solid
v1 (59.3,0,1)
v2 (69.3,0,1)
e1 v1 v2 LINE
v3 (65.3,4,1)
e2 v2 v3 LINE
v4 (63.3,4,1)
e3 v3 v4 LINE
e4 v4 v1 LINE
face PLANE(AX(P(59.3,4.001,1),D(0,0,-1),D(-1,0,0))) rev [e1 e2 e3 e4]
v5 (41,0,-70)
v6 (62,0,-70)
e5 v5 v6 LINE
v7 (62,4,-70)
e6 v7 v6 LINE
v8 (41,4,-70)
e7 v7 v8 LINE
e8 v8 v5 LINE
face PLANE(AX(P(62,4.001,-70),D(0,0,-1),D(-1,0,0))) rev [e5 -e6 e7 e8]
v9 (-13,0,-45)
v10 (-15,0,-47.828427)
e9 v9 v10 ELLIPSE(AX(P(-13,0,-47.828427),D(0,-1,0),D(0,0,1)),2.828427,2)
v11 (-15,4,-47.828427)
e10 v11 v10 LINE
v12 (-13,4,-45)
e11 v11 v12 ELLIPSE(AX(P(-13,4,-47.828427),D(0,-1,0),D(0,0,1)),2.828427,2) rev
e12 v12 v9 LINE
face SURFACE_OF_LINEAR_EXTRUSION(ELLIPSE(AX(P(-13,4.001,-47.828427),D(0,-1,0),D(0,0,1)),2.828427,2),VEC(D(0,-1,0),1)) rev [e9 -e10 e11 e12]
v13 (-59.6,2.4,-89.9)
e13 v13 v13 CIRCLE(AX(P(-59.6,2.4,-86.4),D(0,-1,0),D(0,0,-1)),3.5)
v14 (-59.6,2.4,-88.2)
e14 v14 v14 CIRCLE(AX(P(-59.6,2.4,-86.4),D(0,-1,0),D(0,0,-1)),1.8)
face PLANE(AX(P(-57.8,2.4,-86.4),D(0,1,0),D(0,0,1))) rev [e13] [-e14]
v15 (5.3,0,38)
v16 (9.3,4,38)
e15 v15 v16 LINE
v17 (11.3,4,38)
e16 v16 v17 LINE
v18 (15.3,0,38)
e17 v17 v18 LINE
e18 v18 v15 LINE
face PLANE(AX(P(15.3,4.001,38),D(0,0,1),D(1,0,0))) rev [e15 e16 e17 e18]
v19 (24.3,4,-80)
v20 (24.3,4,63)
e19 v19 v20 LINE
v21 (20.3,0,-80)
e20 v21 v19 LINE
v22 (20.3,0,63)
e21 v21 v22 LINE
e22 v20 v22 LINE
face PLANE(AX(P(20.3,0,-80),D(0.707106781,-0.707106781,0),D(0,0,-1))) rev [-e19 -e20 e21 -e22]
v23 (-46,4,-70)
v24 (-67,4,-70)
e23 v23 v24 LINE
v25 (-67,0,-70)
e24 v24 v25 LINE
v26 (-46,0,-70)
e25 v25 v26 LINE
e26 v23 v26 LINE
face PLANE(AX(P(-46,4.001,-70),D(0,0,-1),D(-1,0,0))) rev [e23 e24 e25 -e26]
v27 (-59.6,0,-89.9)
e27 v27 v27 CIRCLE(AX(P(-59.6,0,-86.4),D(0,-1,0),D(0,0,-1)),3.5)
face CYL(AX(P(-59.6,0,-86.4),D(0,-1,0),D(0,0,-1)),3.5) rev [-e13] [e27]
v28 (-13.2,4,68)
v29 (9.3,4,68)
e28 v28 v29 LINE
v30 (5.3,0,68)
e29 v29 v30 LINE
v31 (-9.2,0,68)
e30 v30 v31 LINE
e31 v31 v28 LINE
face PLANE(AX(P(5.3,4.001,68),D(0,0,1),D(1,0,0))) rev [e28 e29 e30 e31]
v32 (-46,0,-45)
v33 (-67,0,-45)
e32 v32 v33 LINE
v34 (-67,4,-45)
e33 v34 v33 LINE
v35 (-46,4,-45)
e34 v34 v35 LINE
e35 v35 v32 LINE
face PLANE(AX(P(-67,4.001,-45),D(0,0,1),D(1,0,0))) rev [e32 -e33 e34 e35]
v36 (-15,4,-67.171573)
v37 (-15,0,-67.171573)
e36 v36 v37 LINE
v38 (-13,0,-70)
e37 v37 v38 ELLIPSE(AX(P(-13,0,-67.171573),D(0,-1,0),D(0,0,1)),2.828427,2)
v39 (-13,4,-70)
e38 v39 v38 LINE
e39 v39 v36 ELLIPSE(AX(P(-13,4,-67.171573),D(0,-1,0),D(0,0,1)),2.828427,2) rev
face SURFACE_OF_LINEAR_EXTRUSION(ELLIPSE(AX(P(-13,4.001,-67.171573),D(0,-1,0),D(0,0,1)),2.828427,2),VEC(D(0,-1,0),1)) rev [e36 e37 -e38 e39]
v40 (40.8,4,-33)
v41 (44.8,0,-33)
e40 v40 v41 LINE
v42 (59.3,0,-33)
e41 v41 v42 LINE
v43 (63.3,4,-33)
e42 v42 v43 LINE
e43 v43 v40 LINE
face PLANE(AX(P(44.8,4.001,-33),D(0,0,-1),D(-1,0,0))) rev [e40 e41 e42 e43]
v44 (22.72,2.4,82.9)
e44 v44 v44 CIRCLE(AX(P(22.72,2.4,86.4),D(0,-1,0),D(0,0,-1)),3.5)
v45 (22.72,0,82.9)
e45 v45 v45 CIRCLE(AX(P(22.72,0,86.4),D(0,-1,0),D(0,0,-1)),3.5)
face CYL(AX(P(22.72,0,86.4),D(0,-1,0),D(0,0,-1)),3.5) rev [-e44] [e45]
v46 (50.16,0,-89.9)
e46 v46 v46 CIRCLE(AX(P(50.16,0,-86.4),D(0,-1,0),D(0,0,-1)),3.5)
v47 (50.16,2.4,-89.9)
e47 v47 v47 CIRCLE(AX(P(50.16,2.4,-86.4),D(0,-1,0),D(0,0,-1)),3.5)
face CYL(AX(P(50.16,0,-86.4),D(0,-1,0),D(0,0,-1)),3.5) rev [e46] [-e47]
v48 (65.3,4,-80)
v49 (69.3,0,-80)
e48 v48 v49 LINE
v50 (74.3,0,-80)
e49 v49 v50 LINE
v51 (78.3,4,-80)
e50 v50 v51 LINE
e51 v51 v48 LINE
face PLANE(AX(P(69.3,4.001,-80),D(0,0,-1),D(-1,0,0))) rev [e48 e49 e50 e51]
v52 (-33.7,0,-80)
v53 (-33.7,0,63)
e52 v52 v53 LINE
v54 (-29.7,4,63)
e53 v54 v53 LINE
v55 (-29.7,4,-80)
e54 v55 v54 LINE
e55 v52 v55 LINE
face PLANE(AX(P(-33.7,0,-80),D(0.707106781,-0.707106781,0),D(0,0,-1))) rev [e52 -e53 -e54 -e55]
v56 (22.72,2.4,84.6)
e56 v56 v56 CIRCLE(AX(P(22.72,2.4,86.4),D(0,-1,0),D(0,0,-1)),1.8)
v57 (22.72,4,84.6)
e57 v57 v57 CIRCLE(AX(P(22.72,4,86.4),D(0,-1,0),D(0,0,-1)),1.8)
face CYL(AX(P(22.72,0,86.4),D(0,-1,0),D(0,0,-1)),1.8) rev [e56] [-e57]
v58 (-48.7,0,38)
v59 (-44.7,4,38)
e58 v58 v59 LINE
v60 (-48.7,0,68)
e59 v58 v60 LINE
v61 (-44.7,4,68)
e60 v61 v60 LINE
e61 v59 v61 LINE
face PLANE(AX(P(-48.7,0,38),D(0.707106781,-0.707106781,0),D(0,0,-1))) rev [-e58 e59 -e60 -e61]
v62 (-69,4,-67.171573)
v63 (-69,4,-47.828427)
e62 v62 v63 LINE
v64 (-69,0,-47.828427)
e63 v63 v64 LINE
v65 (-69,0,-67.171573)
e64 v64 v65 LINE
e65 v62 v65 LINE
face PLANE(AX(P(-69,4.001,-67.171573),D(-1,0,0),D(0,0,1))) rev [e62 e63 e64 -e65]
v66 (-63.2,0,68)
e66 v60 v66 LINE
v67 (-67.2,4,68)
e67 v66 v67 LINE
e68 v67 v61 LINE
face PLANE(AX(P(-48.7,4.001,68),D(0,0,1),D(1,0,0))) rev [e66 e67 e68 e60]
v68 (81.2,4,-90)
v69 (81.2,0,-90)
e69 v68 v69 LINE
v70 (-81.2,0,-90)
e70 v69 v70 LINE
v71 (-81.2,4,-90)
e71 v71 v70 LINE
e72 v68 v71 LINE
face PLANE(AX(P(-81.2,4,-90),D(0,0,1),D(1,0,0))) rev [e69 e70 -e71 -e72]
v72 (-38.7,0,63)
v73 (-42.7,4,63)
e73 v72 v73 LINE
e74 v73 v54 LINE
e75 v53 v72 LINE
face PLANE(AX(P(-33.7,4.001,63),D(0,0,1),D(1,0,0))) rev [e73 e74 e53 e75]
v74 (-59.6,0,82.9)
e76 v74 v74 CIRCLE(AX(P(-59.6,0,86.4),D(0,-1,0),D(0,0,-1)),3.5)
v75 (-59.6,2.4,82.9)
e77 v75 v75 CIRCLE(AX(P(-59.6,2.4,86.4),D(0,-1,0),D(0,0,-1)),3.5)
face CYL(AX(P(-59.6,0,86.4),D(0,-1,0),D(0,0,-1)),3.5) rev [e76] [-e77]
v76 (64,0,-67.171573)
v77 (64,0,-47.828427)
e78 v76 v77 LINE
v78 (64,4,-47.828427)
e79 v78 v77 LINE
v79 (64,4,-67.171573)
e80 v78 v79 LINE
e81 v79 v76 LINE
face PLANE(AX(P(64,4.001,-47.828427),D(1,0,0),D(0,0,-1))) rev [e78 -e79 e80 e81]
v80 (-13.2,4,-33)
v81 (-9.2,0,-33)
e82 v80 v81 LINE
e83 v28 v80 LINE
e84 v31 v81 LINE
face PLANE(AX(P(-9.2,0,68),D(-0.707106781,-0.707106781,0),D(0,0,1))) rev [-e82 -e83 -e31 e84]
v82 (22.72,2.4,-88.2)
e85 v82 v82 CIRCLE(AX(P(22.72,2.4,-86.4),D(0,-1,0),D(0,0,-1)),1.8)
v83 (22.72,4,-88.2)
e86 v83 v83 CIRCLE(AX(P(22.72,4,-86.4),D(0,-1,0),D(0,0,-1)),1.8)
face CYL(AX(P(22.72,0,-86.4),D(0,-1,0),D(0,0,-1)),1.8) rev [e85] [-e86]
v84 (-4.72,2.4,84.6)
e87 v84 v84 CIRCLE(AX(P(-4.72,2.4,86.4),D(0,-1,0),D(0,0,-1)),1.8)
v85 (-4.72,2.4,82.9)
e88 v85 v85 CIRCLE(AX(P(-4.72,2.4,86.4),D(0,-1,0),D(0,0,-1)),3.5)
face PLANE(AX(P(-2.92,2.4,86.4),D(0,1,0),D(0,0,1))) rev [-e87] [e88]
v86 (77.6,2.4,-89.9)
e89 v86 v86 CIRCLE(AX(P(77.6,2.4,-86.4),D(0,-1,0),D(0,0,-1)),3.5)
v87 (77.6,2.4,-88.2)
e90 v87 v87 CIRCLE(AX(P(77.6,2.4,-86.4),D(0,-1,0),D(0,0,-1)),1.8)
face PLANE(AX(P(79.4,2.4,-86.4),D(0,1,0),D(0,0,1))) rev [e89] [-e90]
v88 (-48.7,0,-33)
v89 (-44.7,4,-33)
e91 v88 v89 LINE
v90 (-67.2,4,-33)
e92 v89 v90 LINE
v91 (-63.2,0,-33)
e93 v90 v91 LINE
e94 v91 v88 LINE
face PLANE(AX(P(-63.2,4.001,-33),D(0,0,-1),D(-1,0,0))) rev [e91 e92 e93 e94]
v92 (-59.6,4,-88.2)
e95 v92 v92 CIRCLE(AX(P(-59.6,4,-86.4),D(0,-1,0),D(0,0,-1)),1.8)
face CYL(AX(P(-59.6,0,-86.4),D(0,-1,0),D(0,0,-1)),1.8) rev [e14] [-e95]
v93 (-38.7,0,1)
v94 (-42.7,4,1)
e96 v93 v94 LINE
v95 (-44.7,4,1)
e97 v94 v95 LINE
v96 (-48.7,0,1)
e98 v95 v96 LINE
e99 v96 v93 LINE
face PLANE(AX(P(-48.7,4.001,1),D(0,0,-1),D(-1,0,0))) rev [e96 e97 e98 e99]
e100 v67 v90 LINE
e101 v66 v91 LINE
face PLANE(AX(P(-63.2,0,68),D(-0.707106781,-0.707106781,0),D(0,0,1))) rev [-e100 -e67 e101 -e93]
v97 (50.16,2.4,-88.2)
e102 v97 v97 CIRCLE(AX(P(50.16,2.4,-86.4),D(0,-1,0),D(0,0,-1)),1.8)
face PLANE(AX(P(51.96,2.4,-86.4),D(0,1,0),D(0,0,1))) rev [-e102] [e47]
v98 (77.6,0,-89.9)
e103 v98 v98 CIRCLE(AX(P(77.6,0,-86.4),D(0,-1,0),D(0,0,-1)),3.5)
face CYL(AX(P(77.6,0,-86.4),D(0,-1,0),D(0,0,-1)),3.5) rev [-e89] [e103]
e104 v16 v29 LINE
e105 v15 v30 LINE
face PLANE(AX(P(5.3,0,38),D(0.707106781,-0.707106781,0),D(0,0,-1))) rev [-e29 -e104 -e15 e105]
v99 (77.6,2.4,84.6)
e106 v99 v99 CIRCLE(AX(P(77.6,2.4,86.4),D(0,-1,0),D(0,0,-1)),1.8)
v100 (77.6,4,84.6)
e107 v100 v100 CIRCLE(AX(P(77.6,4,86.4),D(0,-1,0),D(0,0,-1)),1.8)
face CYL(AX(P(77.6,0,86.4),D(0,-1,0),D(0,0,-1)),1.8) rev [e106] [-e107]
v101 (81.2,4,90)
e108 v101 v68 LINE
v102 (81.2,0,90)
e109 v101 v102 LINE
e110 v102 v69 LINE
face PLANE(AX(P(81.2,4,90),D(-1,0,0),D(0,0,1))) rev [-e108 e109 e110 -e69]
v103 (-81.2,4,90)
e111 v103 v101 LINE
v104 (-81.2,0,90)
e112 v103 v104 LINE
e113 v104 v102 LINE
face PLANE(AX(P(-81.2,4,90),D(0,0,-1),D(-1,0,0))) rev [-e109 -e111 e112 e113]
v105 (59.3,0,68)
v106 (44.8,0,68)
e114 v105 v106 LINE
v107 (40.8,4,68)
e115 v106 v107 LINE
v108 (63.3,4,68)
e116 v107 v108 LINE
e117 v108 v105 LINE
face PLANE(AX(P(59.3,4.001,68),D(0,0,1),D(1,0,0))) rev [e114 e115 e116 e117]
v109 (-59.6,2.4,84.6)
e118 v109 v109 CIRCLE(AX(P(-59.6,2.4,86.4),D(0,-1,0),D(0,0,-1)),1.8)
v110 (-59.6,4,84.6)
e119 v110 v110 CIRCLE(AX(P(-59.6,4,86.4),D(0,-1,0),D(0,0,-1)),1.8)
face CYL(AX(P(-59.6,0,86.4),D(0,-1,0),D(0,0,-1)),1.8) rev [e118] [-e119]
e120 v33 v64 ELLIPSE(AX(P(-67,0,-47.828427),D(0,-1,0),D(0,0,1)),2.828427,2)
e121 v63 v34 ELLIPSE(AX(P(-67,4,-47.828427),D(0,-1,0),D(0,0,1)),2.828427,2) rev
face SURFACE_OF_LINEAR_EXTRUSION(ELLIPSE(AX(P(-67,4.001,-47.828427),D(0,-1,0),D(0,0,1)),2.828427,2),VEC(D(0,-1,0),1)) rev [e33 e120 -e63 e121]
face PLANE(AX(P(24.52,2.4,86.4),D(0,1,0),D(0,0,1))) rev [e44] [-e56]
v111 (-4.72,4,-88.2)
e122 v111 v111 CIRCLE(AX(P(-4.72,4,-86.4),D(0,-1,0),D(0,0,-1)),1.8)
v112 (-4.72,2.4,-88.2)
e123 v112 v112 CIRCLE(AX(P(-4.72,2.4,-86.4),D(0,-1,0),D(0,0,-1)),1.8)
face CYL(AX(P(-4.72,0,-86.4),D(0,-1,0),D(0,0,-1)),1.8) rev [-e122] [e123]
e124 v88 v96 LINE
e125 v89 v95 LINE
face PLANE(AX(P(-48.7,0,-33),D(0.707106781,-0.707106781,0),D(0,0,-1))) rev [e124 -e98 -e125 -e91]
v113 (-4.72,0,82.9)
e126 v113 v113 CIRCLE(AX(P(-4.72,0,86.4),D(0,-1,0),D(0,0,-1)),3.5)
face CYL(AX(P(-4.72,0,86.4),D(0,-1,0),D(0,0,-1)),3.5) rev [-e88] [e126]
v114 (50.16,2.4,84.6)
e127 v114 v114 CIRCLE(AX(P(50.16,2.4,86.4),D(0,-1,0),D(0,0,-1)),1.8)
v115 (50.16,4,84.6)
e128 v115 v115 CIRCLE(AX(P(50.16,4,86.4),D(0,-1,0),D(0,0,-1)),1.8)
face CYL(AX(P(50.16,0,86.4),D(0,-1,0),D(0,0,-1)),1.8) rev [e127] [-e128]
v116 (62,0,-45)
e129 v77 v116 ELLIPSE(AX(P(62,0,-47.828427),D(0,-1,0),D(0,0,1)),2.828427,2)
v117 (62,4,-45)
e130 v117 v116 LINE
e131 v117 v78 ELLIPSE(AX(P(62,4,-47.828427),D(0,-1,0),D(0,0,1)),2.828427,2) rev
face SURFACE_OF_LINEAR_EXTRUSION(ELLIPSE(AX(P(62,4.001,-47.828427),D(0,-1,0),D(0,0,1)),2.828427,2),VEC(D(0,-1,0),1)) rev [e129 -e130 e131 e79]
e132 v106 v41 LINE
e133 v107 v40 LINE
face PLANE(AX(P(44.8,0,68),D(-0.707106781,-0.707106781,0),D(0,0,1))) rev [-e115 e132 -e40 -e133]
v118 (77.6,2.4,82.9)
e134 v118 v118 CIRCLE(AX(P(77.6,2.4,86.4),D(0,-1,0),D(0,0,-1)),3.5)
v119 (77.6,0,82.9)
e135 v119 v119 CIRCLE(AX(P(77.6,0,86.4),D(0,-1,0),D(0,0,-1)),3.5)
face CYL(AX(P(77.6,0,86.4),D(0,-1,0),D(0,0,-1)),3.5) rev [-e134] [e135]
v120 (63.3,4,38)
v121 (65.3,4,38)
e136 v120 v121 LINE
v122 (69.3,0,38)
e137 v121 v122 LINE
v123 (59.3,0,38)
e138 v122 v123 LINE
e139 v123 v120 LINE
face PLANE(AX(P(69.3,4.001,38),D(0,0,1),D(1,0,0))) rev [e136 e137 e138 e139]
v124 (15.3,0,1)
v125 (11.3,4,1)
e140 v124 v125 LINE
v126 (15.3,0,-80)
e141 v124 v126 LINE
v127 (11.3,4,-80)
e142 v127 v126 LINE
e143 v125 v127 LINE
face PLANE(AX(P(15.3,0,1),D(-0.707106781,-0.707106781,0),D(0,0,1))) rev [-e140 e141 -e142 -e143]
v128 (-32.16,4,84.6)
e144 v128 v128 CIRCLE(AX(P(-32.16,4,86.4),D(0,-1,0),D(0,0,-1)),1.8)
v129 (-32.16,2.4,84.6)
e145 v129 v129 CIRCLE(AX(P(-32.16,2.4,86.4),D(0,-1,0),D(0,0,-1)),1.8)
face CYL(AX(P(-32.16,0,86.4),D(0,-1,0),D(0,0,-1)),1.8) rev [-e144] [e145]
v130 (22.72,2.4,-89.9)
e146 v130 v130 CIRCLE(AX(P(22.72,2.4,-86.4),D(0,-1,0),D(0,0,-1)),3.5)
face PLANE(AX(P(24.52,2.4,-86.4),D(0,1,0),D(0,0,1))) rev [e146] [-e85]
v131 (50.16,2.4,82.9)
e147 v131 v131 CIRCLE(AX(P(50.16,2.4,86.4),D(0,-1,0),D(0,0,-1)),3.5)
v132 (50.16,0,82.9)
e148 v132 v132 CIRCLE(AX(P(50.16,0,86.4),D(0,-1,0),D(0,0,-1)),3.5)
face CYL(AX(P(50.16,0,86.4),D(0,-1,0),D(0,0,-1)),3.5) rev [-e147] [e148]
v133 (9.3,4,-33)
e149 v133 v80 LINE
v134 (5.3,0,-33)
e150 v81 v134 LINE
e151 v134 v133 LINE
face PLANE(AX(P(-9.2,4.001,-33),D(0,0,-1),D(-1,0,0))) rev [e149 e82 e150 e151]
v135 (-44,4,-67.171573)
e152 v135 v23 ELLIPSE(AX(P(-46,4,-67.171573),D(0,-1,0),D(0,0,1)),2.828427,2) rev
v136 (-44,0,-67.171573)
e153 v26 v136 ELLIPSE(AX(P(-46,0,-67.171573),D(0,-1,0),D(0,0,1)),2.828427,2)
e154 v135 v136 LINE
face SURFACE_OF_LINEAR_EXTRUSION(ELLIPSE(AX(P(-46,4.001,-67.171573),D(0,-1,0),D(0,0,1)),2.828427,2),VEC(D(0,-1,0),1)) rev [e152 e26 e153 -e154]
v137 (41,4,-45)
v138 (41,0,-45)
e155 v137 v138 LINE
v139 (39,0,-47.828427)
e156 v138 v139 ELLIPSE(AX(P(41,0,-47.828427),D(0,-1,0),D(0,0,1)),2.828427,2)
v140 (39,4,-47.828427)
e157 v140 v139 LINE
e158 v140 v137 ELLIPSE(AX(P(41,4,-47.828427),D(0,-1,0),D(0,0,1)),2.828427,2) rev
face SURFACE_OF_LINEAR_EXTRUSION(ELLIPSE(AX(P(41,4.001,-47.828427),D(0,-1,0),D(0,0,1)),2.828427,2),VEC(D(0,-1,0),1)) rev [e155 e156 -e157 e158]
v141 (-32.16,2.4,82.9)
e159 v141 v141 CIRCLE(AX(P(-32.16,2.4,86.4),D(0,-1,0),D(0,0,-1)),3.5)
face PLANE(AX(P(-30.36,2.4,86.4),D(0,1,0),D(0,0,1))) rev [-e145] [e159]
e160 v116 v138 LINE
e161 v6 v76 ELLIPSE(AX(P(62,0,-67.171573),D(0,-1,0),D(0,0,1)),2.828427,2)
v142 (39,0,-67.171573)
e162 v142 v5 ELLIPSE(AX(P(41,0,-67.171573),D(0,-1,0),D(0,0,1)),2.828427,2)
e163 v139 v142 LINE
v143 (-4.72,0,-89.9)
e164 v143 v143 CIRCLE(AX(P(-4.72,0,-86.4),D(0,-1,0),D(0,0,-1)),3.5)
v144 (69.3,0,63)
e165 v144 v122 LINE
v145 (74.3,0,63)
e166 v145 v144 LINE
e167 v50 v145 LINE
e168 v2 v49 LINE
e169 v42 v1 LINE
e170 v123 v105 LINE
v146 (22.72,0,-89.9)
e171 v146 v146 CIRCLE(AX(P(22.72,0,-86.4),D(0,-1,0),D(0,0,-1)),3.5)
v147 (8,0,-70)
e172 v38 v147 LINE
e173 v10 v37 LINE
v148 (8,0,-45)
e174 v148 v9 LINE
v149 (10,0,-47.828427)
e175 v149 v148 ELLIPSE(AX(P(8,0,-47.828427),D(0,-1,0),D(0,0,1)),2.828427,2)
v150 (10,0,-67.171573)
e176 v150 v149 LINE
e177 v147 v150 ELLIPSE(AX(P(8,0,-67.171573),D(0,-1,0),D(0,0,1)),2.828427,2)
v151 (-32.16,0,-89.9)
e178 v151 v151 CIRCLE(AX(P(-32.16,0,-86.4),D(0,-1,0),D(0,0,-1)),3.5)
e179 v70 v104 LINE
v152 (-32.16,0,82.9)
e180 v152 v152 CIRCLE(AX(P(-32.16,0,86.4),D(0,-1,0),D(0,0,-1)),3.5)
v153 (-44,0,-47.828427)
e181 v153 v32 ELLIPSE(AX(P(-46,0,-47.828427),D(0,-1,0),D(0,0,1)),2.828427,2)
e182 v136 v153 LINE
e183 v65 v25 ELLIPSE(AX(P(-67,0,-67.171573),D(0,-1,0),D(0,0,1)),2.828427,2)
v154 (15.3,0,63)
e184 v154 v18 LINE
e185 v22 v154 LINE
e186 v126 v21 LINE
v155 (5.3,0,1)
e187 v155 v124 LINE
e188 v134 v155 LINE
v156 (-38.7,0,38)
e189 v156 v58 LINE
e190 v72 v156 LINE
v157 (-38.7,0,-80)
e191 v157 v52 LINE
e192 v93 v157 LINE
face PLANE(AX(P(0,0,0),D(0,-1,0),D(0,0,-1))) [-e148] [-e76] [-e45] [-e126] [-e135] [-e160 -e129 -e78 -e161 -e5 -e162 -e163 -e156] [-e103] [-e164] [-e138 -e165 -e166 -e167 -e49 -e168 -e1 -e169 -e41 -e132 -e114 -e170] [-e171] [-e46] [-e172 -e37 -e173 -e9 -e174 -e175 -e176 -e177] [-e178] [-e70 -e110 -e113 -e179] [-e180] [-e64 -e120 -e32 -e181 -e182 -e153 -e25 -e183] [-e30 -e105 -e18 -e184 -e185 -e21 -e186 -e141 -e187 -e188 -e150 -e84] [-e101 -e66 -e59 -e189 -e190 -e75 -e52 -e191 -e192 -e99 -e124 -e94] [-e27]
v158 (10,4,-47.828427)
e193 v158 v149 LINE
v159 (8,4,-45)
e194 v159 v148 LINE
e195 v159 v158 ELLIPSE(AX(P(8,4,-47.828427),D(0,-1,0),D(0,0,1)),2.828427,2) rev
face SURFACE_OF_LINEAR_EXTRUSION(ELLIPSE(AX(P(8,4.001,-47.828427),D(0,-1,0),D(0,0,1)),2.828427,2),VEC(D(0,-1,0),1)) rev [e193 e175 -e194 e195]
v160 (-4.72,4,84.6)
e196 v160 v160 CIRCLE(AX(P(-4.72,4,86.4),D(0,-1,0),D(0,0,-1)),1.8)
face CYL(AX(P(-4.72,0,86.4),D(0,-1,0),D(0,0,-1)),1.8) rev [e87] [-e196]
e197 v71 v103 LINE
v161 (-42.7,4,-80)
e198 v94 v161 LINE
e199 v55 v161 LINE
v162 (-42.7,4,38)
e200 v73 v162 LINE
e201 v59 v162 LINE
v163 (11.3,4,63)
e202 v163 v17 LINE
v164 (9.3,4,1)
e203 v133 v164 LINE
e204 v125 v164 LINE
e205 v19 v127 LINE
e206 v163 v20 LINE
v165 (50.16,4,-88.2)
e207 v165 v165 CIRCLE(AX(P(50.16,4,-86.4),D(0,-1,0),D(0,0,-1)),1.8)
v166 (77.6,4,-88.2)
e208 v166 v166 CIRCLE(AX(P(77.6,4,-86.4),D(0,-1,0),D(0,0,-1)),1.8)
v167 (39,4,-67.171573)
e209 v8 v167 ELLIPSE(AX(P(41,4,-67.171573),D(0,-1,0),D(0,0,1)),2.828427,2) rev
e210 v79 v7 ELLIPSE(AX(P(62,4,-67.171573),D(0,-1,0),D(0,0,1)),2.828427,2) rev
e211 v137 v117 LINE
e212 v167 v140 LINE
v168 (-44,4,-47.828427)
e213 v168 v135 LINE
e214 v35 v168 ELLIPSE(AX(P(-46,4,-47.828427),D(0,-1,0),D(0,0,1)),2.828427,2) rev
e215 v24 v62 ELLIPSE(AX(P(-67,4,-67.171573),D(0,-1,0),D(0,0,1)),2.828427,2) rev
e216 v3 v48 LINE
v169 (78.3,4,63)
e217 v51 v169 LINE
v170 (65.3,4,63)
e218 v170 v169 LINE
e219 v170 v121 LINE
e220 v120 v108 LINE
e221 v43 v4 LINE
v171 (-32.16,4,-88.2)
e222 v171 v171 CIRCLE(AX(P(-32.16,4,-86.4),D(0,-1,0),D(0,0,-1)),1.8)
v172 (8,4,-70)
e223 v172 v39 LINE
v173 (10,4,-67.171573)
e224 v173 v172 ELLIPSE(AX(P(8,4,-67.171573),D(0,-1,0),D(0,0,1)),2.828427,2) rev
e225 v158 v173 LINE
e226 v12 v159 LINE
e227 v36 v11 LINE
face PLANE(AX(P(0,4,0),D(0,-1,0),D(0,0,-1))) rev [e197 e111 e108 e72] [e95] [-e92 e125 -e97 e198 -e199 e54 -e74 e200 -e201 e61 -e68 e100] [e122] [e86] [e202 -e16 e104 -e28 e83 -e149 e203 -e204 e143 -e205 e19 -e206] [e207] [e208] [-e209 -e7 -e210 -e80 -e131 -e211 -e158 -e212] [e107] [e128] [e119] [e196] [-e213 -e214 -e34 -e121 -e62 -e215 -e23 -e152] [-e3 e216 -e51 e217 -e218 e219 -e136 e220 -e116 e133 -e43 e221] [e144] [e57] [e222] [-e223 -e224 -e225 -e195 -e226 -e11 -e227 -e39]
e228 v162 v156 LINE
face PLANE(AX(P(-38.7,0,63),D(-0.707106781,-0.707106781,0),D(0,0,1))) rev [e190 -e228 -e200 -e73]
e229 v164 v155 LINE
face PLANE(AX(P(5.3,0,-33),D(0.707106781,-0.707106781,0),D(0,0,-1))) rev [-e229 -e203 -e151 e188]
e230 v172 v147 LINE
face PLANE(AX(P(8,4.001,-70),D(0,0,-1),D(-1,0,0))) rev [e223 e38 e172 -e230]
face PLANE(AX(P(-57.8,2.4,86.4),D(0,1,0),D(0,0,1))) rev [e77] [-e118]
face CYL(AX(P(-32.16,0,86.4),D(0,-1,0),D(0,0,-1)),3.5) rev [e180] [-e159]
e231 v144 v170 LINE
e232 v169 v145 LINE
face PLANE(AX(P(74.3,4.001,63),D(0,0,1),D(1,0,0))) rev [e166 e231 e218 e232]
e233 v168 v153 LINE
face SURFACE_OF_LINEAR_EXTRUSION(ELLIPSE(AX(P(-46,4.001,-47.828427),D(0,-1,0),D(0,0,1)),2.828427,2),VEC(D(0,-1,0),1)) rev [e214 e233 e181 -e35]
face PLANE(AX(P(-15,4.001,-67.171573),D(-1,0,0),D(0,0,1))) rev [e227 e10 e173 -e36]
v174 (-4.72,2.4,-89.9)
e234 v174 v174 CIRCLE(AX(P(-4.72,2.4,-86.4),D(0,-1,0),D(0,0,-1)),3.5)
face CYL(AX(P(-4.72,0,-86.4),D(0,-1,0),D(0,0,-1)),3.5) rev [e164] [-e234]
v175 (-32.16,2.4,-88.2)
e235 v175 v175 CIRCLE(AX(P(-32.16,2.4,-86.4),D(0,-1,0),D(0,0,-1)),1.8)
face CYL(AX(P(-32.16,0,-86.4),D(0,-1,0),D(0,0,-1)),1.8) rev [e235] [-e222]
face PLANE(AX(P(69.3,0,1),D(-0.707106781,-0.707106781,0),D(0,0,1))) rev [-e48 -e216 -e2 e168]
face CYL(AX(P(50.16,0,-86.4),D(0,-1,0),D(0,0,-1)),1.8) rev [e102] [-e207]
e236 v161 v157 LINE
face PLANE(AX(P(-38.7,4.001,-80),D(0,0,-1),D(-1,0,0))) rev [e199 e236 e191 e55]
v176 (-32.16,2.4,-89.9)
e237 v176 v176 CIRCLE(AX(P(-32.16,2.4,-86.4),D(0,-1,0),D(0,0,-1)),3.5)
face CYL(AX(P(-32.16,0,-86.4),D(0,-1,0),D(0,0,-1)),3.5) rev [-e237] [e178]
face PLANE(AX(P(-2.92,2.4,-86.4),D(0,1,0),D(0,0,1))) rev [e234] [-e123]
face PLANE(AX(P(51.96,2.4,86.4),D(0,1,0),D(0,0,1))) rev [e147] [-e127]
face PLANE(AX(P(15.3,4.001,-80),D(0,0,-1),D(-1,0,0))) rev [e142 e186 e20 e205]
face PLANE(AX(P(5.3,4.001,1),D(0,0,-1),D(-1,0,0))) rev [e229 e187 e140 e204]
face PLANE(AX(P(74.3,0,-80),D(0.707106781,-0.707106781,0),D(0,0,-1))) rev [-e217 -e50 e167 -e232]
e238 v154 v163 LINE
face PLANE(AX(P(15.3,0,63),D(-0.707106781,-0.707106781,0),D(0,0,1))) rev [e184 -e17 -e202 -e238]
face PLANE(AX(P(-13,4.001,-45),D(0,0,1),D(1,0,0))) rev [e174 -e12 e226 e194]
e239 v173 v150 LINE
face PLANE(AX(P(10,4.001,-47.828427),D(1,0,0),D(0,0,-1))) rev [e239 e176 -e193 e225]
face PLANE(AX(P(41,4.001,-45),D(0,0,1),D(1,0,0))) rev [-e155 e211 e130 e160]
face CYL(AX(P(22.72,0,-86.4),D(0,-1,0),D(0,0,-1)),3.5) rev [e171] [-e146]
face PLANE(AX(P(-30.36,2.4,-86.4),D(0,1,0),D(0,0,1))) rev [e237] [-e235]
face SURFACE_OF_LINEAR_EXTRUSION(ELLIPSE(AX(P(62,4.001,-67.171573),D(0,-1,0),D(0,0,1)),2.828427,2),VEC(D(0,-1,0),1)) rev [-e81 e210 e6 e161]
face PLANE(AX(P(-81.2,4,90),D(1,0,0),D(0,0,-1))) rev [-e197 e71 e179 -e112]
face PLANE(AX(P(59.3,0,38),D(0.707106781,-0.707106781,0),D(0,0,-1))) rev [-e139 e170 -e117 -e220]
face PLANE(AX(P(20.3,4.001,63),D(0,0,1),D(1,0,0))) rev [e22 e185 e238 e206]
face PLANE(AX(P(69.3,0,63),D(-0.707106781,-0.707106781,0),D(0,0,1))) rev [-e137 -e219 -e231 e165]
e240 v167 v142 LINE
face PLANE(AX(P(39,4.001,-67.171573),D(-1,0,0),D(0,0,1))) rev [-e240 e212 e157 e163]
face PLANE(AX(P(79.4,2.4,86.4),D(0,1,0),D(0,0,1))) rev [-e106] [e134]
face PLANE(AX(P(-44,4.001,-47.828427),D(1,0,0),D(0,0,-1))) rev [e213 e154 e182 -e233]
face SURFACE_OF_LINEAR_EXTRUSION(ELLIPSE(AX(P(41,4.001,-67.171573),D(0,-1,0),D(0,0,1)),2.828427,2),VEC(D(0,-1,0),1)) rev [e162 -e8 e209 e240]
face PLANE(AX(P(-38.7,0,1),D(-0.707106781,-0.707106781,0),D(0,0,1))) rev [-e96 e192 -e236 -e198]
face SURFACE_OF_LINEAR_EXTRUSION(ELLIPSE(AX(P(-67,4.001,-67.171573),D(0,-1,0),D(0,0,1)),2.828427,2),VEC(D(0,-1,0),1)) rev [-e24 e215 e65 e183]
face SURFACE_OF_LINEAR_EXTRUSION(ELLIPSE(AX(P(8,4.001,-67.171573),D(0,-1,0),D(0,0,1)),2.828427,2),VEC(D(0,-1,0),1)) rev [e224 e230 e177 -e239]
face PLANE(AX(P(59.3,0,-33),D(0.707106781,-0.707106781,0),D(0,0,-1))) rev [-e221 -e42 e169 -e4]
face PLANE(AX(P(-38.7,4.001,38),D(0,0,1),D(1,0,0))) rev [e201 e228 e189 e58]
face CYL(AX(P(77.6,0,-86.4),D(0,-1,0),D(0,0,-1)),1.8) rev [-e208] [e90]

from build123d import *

# Parameters (mm, degrees)
SZKIC1_W                                          = 162.4
SZKIC1_H                                          = 180
DODANIE_WYCI_GNI_CIE1_DEPTH                       = 4
WYTNIJ_WYCI_GNI_CIE1_REACH                        = 123.282
SFAZOWANIE1_SIZE                                  = 4
POG_BIENIE_WALCOWE_POD_M3_RUB_Z_BEM_S_D           = 3.6
POG_BIENIE_WALCOWE_POD_M3_RUB_Z_BEM_S_DEPTH       = 6.7
POG_BIENIE_WALCOWE_POD_M3_RUB_Z_BEM_S_CBORE_D     = 7
POG_BIENIE_WALCOWE_POD_M3_RUB_Z_BEM_S_CBORE_DEPTH = 2.4
POG_BIENIE_WALCOWE_POD_M3_RUB_Z_BEM_S_TIP         = 1.081549114


with BuildPart() as part:
    # Szkic1 → Dodanie-wyciągnięcie1 (new body)
    with BuildSketch(Plane(origin=(0, 0, 0), x_dir=(1, 0, 0), z_dir=(0, 1, 0))):
        Rectangle(SZKIC1_W, SZKIC1_H)
    extrude(amount=DODANIE_WYCI_GNI_CIE1_DEPTH)

    # Szkic2 → Wytnij-wyciągnięcie1 (cut, up to next)
    with BuildSketch(Plane.XZ, mode=Mode.PRIVATE) as wytnij_wyci_gni_cie1_sk1:
        with BuildLine():
            Line((-44, -47.828427125), (-44, -67.171572875))
            add(Edge.make_bspline(
                [(-46, -70), (-44, -70), (-44, -67.171572875)],
                knots=[3.141592654, 3.141592654, 3.141592654, 4.71238898, 4.71238898, 4.71238898], degree=2, weights=[1, 0.707106781, 1]))
            Line((-46, -70), (-67, -70))
            add(Edge.make_bspline(
                [(-69, -67.171572875), (-69, -70), (-67, -70)],
                knots=[1.570796327, 1.570796327, 1.570796327, 3.141592654, 3.141592654, 3.141592654], degree=2, weights=[1, 0.707106781, 1]))
            Line((-69, -67.171572875), (-69, -47.828427125))
            add(Edge.make_bspline(
                [(-67, -45), (-69, -45), (-69, -47.828427125)],
                knots=[0, 0, 0, 1.570796327, 1.570796327, 1.570796327], degree=2, weights=[1, 0.707106781, 1]))
            Line((-67, -45), (-46, -45))
            add(Edge.make_bspline(
                [(-44, -47.828427125), (-44, -45), (-46, -45)],
                knots=[4.71238898, 4.71238898, 4.71238898, 6.283185307, 6.283185307, 6.283185307], degree=2, weights=[1, 0.707106781, 1]))
        make_face()
    wytnij_wyci_gni_cie1_tool1 = extrude(wytnij_wyci_gni_cie1_sk1.sketch, amount=-WYTNIJ_WYCI_GNI_CIE1_REACH, mode=Mode.PRIVATE) & part.part
    # Szkic2 → Wytnij-wyciągnięcie1 (cut, up to next)
    with BuildSketch(Plane.XZ, mode=Mode.PRIVATE) as wytnij_wyci_gni_cie1_sk2:
        with BuildLine():
            Line((10, -47.828427125), (10, -67.171572875))
            add(Edge.make_bspline(
                [(8, -70), (10, -70), (10, -67.171572875)],
                knots=[3.141592654, 3.141592654, 3.141592654, 4.71238898, 4.71238898, 4.71238898], degree=2, weights=[1, 0.707106781, 1]))
            Line((8, -70), (-13, -70))
            add(Edge.make_bspline(
                [(-15, -67.171572875), (-15, -70), (-13, -70)],
                knots=[1.570796327, 1.570796327, 1.570796327, 3.141592654, 3.141592654, 3.141592654], degree=2, weights=[1, 0.707106781, 1]))
            Line((-15, -67.171572875), (-15, -47.828427125))
            add(Edge.make_bspline(
                [(-13, -45), (-15, -45), (-15, -47.828427125)],
                knots=[0, 0, 0, 1.570796327, 1.570796327, 1.570796327], degree=2, weights=[1, 0.707106781, 1]))
            Line((-13, -45), (8, -45))
            add(Edge.make_bspline(
                [(10, -47.828427125), (10, -45), (8, -45)],
                knots=[4.71238898, 4.71238898, 4.71238898, 6.283185307, 6.283185307, 6.283185307], degree=2, weights=[1, 0.707106781, 1]))
        make_face()
    wytnij_wyci_gni_cie1_tool2 = extrude(wytnij_wyci_gni_cie1_sk2.sketch, amount=-WYTNIJ_WYCI_GNI_CIE1_REACH, mode=Mode.PRIVATE) & part.part
    # Szkic2 → Wytnij-wyciągnięcie1 (cut, up to next)
    with BuildSketch(Plane.XZ, mode=Mode.PRIVATE) as wytnij_wyci_gni_cie1_sk3:
        Polygon((-9.2, -33), (5.3, -33), (5.3, 1), (15.3, 1), (15.3, -80), (20.3, -80), (20.3, 63), (15.3, 63), (15.3, 38), (5.3, 38), (5.3, 68), (-9.2, 68), align=None)
    wytnij_wyci_gni_cie1_tool3 = extrude(wytnij_wyci_gni_cie1_sk3.sketch, amount=-WYTNIJ_WYCI_GNI_CIE1_REACH, mode=Mode.PRIVATE) & part.part
    # Szkic2 → Wytnij-wyciągnięcie1 (cut, up to next)
    with BuildSketch(Plane.XZ, mode=Mode.PRIVATE) as wytnij_wyci_gni_cie1_sk4:
        Polygon((-63.2, -33), (-48.7, -33), (-48.7, 1), (-38.7, 1), (-38.7, -80), (-33.7, -80), (-33.7, 63), (-38.7, 63), (-38.7, 38), (-48.7, 38), (-48.7, 68), (-63.2, 68), align=None)
    wytnij_wyci_gni_cie1_tool4 = extrude(wytnij_wyci_gni_cie1_sk4.sketch, amount=-WYTNIJ_WYCI_GNI_CIE1_REACH, mode=Mode.PRIVATE) & part.part
    # Szkic2 → Wytnij-wyciągnięcie1 (cut, up to next)
    with BuildSketch(Plane.XZ, mode=Mode.PRIVATE) as wytnij_wyci_gni_cie1_sk5:
        with BuildLine():
            Line((64, -47.828427125), (64, -67.171572875))
            add(Edge.make_bspline(
                [(62, -70), (64, -70), (64, -67.171572875)],
                knots=[3.141592654, 3.141592654, 3.141592654, 4.71238898, 4.71238898, 4.71238898], degree=2, weights=[1, 0.707106781, 1]))
            Line((62, -70), (41, -70))
            add(Edge.make_bspline(
                [(39, -67.171572875), (39, -70), (41, -70)],
                knots=[1.570796327, 1.570796327, 1.570796327, 3.141592654, 3.141592654, 3.141592654], degree=2, weights=[1, 0.707106781, 1]))
            Line((39, -67.171572875), (39, -47.828427125))
            add(Edge.make_bspline(
                [(41, -45), (39, -45), (39, -47.828427125)],
                knots=[0, 0, 0, 1.570796327, 1.570796327, 1.570796327], degree=2, weights=[1, 0.707106781, 1]))
            Line((41, -45), (62, -45))
            add(Edge.make_bspline(
                [(64, -47.828427125), (64, -45), (62, -45)],
                knots=[4.71238898, 4.71238898, 4.71238898, 6.283185307, 6.283185307, 6.283185307], degree=2, weights=[1, 0.707106781, 1]))
        make_face()
    wytnij_wyci_gni_cie1_tool5 = extrude(wytnij_wyci_gni_cie1_sk5.sketch, amount=-WYTNIJ_WYCI_GNI_CIE1_REACH, mode=Mode.PRIVATE) & part.part
    # Szkic2 → Wytnij-wyciągnięcie1 (cut, up to next)
    with BuildSketch(Plane.XZ, mode=Mode.PRIVATE) as wytnij_wyci_gni_cie1_sk6:
        Polygon((44.8, -33), (59.3, -33), (59.3, 1), (69.3, 1), (69.3, -80), (74.3, -80), (74.3, 63), (69.3, 63), (69.3, 38), (59.3, 38), (59.3, 68), (44.8, 68), align=None)
    wytnij_wyci_gni_cie1_tool6 = extrude(wytnij_wyci_gni_cie1_sk6.sketch, amount=-WYTNIJ_WYCI_GNI_CIE1_REACH, mode=Mode.PRIVATE) & part.part
    add(wytnij_wyci_gni_cie1_tool1.solids().sort_by_distance((-56.5, 0, -57.5))[0], mode=Mode.SUBTRACT)
    add(wytnij_wyci_gni_cie1_tool2.solids().sort_by_distance((-2.5, 0, -57.5))[0], mode=Mode.SUBTRACT)
    add(wytnij_wyci_gni_cie1_tool3.solids().sort_by_distance((5.366631, 0, 10.498627))[0], mode=Mode.SUBTRACT)
    add(wytnij_wyci_gni_cie1_tool4.solids().sort_by_distance((-48.633369, 0, 10.498627))[0], mode=Mode.SUBTRACT)
    add(wytnij_wyci_gni_cie1_tool5.solids().sort_by_distance((51.5, 0, -57.5))[0], mode=Mode.SUBTRACT)
    add(wytnij_wyci_gni_cie1_tool6.solids().sort_by_distance((59.366631, 0, 10.498627))[0], mode=Mode.SUBTRACT)

    # Sfazowanie1
    sfazowanie1_edges = [part.edges().sort_by_distance(p)[0] for p in [
        (69.3, 4, -39.5),
        (74.3, 4, -8.5),
        (69.3, 4, 50.5),
        (59.3, 4, 53),
        (59.3, 4, -16),
        (44.8, 4, 17.5),
        (15.3, 4, -39.5),
        (15.3, 4, 50.5),
        (20.3, 4, -8.5),
        (5.3, 4, 53),
        (5.3, 4, -16),
        (-9.2, 4, 17.5),
        (-33.7, 4, -8.5),
        (-38.7, 4, -39.5),
        (-38.7, 4, 50.5),
        (-48.7, 4, 53),
        (-48.7, 4, -16),
        (-63.2, 4, 17.5),
    ]]
    chamfer(sfazowanie1_edges, length=SFAZOWANIE1_SIZE - 0.0001)  # a hair under: the kernel refuses the full size

    # Pogłębienie walcowe pod M3 Śrubę z łbem stożkowym ściętym1
    with Locations(Plane.XZ):
        with Locations((77.6, 86.4), (77.6, -86.4), (50.16, -86.4), (22.72, -86.4), (-4.72, -86.4), (-32.16, -86.4), (-59.6, -86.4), (-59.6, 86.4), (-32.16, 86.4), (-4.72, 86.4), (22.72, 86.4), (50.16, 86.4)):
            CounterBoreHole(POG_BIENIE_WALCOWE_POD_M3_RUB_Z_BEM_S_D / 2, POG_BIENIE_WALCOWE_POD_M3_RUB_Z_BEM_S_CBORE_D / 2, POG_BIENIE_WALCOWE_POD_M3_RUB_Z_BEM_S_CBORE_DEPTH, depth=POG_BIENIE_WALCOWE_POD_M3_RUB_Z_BEM_S_DEPTH)
            with Locations((0, 0, -(POG_BIENIE_WALCOWE_POD_M3_RUB_Z_BEM_S_DEPTH + POG_BIENIE_WALCOWE_POD_M3_RUB_Z_BEM_S_TIP / 2))):  # 118° drill point
                Cone(0, POG_BIENIE_WALCOWE_POD_M3_RUB_Z_BEM_S_D / 2, POG_BIENIE_WALCOWE_POD_M3_RUB_Z_BEM_S_TIP, mode=Mode.SUBTRACT)


solid = part.part
